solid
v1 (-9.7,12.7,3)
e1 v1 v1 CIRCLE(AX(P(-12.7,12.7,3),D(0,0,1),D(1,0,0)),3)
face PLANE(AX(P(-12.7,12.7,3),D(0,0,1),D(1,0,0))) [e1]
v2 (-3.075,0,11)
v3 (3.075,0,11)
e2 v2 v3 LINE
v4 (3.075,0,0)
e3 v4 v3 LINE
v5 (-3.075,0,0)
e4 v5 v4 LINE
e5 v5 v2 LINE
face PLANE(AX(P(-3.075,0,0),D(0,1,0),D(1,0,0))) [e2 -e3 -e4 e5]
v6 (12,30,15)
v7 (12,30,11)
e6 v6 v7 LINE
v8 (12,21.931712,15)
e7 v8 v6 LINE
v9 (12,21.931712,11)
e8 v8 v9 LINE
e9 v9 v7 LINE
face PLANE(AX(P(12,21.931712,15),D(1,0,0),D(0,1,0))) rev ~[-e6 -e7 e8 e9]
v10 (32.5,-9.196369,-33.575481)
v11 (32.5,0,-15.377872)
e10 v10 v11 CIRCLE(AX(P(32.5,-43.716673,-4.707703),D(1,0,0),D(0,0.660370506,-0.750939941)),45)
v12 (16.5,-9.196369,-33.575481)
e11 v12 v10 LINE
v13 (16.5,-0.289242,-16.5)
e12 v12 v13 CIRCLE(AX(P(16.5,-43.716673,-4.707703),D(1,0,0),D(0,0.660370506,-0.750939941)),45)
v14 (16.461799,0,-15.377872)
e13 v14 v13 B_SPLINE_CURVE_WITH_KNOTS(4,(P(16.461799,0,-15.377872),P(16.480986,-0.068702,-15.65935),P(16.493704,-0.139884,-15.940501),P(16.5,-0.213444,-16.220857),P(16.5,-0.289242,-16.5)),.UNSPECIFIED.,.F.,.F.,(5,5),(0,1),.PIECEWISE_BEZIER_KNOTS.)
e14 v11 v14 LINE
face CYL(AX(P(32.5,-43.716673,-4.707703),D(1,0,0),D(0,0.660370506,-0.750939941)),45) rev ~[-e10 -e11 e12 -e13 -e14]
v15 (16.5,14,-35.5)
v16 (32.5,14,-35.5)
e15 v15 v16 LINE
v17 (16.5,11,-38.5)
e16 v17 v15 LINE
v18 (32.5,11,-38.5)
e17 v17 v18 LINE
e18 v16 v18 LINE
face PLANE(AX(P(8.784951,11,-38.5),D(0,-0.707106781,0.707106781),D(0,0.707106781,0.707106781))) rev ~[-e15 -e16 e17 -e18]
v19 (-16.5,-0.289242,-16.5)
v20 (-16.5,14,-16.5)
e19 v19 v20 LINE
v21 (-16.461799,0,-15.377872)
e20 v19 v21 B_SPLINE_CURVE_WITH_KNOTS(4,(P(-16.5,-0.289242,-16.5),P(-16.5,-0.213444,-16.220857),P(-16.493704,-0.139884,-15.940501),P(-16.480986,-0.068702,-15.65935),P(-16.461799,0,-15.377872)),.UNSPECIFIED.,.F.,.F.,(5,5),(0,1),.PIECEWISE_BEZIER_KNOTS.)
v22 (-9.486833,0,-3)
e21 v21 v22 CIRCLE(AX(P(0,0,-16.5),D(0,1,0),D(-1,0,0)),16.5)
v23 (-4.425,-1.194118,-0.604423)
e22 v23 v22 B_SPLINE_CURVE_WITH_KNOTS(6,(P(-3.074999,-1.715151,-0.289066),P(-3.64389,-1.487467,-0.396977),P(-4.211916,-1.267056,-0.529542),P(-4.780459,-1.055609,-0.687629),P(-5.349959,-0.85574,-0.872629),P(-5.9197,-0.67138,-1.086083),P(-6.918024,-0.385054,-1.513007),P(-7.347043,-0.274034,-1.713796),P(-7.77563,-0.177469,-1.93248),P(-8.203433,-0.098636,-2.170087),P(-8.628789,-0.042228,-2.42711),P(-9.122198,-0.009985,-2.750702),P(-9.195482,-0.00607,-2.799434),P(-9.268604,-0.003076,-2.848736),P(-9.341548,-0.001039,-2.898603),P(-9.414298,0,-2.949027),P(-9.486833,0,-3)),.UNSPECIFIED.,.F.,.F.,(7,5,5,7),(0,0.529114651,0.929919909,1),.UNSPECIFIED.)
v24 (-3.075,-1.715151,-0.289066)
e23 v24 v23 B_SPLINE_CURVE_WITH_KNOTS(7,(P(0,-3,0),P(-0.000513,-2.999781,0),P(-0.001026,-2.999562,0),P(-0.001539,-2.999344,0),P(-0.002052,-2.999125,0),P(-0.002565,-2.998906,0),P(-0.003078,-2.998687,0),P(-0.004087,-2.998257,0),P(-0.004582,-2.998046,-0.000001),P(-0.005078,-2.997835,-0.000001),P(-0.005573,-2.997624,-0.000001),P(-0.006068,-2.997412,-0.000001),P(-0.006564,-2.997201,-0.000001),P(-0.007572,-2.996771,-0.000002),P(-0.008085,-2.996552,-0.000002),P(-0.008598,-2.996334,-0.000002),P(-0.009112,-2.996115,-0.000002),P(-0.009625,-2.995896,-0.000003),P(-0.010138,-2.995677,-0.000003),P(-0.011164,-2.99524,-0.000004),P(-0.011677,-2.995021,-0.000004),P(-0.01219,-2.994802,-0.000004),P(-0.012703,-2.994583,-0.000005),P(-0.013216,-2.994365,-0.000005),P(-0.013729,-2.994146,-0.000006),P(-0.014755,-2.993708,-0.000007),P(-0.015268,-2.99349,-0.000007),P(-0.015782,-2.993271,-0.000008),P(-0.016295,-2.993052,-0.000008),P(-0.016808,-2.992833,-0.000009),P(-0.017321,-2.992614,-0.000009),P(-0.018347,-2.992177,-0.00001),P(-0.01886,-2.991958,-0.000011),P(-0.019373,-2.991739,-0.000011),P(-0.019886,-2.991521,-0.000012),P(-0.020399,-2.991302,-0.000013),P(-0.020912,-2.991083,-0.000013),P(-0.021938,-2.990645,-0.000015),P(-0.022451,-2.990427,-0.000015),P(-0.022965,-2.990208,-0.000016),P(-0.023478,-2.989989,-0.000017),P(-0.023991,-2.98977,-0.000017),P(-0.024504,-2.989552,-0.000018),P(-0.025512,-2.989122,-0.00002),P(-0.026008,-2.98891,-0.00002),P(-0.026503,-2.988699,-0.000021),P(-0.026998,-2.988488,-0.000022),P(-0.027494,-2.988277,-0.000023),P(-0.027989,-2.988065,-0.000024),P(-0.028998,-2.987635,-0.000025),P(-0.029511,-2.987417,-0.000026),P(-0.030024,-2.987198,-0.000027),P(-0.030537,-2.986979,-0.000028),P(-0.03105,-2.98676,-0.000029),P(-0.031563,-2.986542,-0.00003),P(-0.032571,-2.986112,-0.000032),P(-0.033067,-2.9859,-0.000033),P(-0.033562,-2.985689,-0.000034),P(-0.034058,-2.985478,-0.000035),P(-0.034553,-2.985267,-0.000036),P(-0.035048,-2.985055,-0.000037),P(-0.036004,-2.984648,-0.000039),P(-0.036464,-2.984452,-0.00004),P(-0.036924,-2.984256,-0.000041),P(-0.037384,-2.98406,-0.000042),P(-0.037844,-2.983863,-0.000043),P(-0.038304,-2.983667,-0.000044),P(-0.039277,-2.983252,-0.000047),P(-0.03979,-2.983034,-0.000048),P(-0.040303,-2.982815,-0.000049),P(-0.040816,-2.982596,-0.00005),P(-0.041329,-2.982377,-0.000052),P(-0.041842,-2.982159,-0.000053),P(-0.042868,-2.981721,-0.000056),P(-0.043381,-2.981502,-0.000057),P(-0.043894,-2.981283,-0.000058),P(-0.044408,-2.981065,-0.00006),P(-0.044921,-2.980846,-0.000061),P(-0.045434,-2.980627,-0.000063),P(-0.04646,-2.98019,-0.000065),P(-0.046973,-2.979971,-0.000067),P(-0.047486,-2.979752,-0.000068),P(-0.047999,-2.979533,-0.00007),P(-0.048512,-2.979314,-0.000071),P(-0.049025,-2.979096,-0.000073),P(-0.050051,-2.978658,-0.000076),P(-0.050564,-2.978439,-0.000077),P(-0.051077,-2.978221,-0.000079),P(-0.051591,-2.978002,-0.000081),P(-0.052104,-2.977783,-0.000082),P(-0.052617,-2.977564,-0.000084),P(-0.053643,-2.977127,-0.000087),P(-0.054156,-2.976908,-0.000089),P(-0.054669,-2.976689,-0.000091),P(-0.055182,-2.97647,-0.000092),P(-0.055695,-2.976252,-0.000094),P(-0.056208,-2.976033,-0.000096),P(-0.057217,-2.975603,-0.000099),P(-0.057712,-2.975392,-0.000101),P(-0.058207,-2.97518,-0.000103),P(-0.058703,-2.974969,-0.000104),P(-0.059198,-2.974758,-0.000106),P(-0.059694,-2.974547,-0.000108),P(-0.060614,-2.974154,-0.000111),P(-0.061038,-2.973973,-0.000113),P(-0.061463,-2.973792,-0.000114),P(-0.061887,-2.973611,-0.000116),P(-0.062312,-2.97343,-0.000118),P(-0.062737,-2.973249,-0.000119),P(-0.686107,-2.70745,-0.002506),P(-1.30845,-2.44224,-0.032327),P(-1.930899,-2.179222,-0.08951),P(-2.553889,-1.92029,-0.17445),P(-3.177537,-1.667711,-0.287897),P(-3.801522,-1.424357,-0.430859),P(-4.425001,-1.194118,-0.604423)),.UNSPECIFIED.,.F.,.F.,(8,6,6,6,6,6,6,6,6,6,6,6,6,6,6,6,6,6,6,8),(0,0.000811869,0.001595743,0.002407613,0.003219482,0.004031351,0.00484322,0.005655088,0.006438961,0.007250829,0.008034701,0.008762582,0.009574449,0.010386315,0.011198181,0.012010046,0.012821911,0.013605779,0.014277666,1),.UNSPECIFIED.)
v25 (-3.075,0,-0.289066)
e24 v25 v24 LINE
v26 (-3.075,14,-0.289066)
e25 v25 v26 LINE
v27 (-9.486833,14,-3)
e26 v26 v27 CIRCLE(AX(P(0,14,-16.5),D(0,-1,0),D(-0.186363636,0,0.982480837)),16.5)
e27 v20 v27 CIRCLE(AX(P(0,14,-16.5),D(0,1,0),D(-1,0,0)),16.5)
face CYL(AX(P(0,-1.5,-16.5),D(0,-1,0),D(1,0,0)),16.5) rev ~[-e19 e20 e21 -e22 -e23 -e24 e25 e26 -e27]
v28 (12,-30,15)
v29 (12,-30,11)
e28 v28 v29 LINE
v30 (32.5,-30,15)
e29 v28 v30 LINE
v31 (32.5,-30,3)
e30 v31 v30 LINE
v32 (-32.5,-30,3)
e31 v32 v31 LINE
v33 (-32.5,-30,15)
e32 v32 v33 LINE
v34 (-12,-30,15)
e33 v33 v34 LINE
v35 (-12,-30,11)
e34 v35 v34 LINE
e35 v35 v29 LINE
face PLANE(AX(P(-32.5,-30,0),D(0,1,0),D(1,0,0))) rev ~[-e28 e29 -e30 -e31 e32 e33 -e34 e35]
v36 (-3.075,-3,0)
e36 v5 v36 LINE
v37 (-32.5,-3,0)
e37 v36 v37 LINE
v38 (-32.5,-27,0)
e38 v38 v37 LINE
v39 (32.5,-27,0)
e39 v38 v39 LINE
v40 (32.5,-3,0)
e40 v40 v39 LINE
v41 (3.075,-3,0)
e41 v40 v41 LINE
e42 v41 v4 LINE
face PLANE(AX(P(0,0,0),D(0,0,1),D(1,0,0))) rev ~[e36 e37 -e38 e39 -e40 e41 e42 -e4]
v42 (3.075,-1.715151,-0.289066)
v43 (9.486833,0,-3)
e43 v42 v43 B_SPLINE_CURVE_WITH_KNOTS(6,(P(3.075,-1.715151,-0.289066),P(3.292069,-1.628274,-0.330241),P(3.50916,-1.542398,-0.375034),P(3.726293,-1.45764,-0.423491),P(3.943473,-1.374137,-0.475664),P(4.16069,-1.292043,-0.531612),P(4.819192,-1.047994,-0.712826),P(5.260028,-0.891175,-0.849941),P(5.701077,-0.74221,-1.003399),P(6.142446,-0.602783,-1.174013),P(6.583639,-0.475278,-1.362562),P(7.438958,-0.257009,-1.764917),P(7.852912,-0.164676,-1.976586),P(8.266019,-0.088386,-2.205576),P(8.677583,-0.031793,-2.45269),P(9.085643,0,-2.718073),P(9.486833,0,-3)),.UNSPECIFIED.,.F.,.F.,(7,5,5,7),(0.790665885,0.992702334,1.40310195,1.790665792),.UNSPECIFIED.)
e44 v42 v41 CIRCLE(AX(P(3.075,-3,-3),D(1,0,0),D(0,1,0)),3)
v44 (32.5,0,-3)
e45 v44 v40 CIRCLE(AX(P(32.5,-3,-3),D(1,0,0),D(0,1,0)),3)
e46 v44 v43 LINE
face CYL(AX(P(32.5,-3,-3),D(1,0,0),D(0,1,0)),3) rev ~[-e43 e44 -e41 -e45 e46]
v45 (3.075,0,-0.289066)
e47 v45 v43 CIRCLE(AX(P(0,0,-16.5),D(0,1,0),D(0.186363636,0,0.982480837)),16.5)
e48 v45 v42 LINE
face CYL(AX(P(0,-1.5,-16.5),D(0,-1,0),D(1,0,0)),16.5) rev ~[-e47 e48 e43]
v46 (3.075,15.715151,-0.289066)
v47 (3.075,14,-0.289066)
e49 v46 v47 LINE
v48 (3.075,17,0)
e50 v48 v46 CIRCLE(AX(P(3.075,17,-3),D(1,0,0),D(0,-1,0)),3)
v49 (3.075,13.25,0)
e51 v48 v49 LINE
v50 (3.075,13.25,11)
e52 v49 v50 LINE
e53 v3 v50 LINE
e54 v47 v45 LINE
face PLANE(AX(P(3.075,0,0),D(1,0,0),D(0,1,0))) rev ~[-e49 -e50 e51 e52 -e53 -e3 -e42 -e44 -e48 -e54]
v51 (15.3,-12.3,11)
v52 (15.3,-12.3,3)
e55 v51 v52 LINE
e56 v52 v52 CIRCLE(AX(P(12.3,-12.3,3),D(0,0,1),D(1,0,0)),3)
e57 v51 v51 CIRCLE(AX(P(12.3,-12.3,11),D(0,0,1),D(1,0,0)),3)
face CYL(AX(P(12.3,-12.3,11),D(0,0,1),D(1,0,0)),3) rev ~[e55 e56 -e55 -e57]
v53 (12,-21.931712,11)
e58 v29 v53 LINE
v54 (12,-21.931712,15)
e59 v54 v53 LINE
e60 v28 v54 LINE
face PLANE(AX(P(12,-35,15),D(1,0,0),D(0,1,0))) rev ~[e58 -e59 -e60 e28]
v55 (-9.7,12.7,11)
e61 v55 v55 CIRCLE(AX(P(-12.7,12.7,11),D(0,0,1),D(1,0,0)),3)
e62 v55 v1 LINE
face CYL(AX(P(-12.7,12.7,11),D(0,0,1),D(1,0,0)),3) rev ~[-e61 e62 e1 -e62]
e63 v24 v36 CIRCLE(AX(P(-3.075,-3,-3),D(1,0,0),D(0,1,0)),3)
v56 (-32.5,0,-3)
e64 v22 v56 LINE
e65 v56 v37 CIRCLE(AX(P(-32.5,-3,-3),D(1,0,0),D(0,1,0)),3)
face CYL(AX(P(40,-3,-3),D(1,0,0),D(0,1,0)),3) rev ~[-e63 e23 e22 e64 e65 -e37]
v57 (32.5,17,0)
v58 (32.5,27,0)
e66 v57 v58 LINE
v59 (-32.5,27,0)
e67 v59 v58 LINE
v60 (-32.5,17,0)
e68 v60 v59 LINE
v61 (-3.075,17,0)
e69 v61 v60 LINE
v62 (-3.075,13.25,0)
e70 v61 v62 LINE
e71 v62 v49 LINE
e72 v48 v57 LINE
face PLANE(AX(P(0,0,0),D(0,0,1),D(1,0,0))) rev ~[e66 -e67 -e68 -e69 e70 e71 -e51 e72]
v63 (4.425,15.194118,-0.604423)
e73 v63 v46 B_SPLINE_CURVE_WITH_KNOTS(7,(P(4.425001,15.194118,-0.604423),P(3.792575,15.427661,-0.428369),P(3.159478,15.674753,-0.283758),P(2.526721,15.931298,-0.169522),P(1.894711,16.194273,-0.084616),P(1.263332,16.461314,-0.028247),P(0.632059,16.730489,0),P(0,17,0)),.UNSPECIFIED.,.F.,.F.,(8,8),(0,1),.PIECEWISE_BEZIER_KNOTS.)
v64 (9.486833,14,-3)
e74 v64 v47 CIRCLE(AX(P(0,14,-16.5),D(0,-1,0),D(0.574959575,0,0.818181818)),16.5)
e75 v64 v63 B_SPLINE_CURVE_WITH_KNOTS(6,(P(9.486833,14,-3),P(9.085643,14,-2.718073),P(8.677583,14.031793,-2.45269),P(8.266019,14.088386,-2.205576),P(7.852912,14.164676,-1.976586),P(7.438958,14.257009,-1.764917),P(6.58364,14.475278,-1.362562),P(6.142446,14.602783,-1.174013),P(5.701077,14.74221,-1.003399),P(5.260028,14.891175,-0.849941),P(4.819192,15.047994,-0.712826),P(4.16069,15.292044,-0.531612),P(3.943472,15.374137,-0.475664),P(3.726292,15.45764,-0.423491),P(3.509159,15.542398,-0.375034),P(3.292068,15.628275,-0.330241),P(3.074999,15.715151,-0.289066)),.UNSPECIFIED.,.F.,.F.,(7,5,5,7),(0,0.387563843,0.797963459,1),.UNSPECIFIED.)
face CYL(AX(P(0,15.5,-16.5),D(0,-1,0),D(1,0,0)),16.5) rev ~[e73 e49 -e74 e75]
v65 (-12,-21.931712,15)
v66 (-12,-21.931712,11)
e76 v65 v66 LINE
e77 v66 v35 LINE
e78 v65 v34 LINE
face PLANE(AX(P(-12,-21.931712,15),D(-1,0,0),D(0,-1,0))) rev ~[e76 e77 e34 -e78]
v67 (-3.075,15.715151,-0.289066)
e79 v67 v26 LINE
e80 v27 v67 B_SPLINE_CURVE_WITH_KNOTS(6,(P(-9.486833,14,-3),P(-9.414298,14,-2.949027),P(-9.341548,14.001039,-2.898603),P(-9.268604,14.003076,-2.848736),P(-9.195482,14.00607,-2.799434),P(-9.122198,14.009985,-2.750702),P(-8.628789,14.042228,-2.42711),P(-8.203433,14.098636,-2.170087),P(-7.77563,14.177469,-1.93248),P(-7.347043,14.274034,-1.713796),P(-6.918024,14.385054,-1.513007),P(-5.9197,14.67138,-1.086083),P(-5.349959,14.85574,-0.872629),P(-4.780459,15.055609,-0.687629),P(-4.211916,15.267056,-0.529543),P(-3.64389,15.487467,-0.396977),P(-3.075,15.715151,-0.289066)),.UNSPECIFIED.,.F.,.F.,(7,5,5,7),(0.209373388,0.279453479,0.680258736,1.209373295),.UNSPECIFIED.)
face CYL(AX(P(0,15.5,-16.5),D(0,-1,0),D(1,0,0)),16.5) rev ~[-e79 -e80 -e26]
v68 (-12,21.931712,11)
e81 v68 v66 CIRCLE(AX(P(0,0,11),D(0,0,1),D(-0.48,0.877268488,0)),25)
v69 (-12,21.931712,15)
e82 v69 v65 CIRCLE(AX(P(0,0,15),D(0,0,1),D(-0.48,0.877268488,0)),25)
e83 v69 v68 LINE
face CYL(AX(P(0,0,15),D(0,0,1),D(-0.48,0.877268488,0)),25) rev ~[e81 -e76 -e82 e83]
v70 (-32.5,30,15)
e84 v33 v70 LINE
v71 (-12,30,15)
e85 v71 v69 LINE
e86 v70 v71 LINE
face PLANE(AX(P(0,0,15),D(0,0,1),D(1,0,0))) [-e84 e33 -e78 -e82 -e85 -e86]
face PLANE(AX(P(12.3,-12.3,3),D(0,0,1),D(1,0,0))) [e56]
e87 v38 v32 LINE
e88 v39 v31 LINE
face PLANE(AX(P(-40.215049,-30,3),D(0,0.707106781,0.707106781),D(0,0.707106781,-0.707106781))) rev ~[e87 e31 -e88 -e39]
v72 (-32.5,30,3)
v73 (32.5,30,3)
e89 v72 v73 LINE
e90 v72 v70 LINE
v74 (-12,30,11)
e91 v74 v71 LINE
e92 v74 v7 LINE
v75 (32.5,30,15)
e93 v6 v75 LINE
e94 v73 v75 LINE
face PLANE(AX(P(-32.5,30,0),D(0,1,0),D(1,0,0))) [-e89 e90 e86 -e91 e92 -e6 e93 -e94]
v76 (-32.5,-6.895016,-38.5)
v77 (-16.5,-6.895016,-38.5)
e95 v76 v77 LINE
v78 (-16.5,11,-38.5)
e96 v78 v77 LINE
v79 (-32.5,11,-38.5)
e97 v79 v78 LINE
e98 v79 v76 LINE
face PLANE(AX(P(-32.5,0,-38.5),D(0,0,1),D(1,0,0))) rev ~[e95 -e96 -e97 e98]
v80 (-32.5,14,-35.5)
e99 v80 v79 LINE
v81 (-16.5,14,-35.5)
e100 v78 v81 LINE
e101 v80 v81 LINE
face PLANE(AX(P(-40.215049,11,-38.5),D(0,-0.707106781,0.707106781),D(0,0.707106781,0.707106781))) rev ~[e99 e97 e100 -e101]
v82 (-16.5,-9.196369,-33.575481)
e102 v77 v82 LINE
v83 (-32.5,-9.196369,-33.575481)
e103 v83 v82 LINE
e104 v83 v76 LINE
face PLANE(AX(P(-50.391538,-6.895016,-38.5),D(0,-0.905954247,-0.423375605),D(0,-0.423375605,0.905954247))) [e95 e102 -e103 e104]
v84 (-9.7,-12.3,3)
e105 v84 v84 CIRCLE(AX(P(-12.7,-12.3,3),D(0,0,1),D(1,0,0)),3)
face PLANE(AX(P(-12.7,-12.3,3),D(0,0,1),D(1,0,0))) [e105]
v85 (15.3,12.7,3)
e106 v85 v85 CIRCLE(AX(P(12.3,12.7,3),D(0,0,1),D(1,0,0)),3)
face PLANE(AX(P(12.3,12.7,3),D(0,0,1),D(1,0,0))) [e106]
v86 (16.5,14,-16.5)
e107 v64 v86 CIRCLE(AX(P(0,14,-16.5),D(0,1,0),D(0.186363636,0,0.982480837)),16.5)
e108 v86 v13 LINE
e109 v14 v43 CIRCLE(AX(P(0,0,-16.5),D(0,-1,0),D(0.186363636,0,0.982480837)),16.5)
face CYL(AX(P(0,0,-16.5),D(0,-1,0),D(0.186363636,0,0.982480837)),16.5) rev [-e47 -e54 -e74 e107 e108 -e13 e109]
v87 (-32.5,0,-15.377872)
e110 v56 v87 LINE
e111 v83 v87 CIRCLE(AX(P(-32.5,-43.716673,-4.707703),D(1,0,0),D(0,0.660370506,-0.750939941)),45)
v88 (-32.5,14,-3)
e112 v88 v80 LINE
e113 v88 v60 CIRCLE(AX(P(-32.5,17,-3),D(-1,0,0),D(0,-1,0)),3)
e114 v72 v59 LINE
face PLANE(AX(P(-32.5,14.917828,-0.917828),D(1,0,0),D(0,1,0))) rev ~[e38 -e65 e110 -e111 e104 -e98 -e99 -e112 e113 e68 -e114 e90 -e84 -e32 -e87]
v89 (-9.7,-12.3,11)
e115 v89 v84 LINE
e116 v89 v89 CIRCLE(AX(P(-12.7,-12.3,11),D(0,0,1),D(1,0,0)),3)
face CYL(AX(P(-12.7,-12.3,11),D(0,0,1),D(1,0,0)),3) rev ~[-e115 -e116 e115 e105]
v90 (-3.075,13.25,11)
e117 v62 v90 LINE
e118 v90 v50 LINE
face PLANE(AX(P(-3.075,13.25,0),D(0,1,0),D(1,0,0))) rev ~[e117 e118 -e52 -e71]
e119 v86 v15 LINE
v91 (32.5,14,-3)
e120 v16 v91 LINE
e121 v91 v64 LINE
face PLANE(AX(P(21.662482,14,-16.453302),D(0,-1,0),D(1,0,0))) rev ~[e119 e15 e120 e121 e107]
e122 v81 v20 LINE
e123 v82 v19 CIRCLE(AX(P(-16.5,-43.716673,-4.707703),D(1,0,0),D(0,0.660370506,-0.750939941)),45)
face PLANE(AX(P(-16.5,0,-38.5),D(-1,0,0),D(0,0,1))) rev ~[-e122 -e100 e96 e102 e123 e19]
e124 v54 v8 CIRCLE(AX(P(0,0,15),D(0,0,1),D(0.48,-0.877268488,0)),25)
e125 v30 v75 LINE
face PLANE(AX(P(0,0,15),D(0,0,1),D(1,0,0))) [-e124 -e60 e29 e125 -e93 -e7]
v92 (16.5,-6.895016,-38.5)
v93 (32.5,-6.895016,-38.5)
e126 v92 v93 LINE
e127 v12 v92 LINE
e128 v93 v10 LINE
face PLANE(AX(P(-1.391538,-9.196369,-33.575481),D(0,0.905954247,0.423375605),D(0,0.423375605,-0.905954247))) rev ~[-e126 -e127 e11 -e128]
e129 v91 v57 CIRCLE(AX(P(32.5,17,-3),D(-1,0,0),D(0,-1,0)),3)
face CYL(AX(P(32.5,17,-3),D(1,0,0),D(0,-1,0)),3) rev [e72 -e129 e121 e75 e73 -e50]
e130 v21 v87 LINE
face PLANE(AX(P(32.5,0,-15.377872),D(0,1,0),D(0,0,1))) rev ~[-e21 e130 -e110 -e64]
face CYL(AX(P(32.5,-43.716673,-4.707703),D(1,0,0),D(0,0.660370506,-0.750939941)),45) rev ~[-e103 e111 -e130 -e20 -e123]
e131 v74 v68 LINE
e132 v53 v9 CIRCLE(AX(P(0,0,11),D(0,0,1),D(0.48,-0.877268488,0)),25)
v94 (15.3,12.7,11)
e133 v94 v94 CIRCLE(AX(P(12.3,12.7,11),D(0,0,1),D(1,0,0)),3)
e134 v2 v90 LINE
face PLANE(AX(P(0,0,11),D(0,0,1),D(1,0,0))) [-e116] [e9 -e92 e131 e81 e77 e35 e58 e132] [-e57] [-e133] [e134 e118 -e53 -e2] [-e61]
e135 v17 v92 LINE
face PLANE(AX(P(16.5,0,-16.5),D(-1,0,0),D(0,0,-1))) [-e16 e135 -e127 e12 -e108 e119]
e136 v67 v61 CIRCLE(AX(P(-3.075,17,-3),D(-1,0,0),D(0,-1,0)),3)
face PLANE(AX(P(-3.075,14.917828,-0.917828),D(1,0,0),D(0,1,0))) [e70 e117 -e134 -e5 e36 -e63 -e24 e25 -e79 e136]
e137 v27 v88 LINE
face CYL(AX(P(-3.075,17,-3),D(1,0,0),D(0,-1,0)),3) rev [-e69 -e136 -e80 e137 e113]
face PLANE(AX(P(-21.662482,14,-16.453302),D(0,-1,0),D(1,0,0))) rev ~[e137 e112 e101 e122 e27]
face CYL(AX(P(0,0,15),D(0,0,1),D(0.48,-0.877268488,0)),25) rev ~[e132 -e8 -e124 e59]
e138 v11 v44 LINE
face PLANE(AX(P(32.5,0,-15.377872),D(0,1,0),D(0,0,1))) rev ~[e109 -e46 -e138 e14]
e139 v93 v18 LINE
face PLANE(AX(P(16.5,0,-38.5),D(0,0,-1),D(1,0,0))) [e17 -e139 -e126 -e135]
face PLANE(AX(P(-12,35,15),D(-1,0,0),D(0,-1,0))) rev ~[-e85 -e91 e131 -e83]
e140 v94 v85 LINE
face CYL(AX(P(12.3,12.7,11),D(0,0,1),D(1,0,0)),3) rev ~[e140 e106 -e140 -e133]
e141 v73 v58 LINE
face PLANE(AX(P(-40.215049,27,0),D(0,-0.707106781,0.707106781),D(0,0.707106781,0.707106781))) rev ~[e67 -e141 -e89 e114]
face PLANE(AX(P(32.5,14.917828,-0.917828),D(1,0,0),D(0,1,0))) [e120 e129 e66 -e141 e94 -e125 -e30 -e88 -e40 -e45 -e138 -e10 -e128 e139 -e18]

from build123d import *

# Parameters (mm, degrees)
F0_W          = 65
F0_H          = 60
F0_W_2        = 6.15
F0_H_2        = 13.25
F1_DEPTH      = 15
F3_DEPTH      = 14
F5_DEPTH      = 4
F6_R          = 3
F7_DEPTH      = 8
F9_DEPTH      = 90
F10_T4_DEPTH  = 29.425
F10_S5_R      = 16.5
F10_T6_DEPTH  = 16
F10_T10_DEPTH = 44.425
F10_S11_R     = 16.5
F10_T12_DEPTH = 24
F10_T17_DEPTH = 44.425
F10_S18_R     = 16.5
F10_T19_DEPTH = 24
F10_T24_DEPTH = 29.425
F10_S25_R     = 16.5
F10_T26_DEPTH = 16
F10_T30_DEPTH = 44.425
F10_S31_R     = 16.5
F10_T32_DEPTH = 24
F10_T37_DEPTH = 29.425
F10_S38_R     = 16.5
F10_T39_DEPTH = 16
F10_T43_DEPTH = 29.425
F10_S44_R     = 16.5
F10_T45_DEPTH = 16
F10_T49_DEPTH = 44.425
F10_S50_R     = 16.5
F10_T51_DEPTH = 24
F11_T1_DEPTH  = 80.4300979278
F11_T3_DEPTH  = 51.7830754439
F11_T5_DEPTH  = 51.7830754439
F11_T7_DEPTH  = 31.4300979278
F11_T9_DEPTH  = 31.4300979278


# Not quite as in the source:
# - a fillet or chamfer that OpenCascade refuses, or shapes differently, is made with other operations: its cross-section is extruded or revolved along the edge and cut away or added


with BuildPart() as f1:
    # F0 (on Top) → F1 (new body)
    with BuildSketch(Plane.XY):
        Rectangle(F0_W, F0_H)
        with Locations((0, 6.625)):
            Rectangle(F0_W_2, F0_H_2, mode=Mode.SUBTRACT)
    extrude(amount=F1_DEPTH)

    # F2 (on Front) → F3 (join, symmetric)
    with BuildSketch(Plane.XZ):
        with BuildLine():
            Line((-3.075, 0), (-32.5, 0))
            Line((-32.5, 0), (-32.5, -38.5))
            Line((-32.5, -38.5), (-16.5, -38.5))
            Line((-16.5, -38.5), (-16.5, -16.5))
            ThreePointArc((-16.5, -16.5), (-12.7080191218, -5.9759204678), (-3.075, -0.2890661898))
            Line((-3.075, -0.2890661898), (-3.075, 0))
        make_face()
        with BuildLine():
            Line((3.075, 0), (3.075, -0.2890661898))
            ThreePointArc((3.075, -0.2890661898), (12.7080191218, -5.9759204678), (16.5, -16.5))
            Line((16.5, -16.5), (16.5, -38.5))
            Line((16.5, -38.5), (32.5, -38.5))
            Line((32.5, -38.5), (32.5, 0))
            Line((32.5, 0), (3.075, 0))
        make_face()
    extrude(amount=F3_DEPTH, both=True)

    # F4 (on face) → F5 (cut)
    with BuildSketch(Plane.XY.offset(15)):
        with BuildLine():
            ThreePointArc((12, -21.9317121995), (25, 0), (12, 21.9317121995))
            Line((12, 21.9317121995), (12, 35))
            Line((12, 35), (-12, 35))
            Line((-12, 35), (-12, 21.9317121995))
            ThreePointArc((-12, 21.9317121995), (-25, 0), (-12, -21.9317121995))
            Line((-12, -21.9317121995), (-12, -35))
            Line((-12, -35), (12, -35))
            Line((12, -35), (12, -21.9317121995))
        make_face()
    extrude(amount=-F5_DEPTH, mode=Mode.SUBTRACT)

    # F6 (on face) → F7 (cut)
    with BuildSketch(Plane.XY.offset(11)):
        with Locations((-12.7, 12.7)):
            Circle(F6_R)
        with Locations((12.3, 12.7)):
            Circle(F6_R)
        with Locations((12.3, -12.3)):
            Circle(F6_R)
        with Locations((-12.7, -12.3)):
            Circle(F6_R)
    extrude(amount=-F7_DEPTH, mode=Mode.SUBTRACT)

    # F8 (on face) → F9 (cut)
    with BuildSketch(Plane.YZ.offset(32.5)):
        with BuildLine():
            Line((0, -15.3778724497), (0, 0))
            Line((0, 0), (-14, 0))
            Line((-14, 0), (-14, -38.5))
            ThreePointArc((-14, -38.5), (-5.2228777507, -28.0149492966), (0, -15.3778724497))
        make_face()
    extrude(amount=-F9_DEPTH, mode=Mode.SUBTRACT)

    # F10: fillet of radius 3 on 4 edges, made by hand


with BuildPart() as f10_tool2:
    # F10_s3 → F10_t4 (new body)
    with BuildSketch(Plane.YZ.offset(32.5)):
        with BuildLine():
            ThreePointArc((0, -3), (-0.8786796564, -0.8786796564), (-3, 0))
            Line((-3, 0), (0, 0))
            Line((0, 0), (0, -3))
        make_face()
    extrude(amount=-F10_T4_DEPTH)

    # F10_s5 → F10_t6 (cut, symmetric)
    with BuildSketch(Plane.XZ.offset(1.5)):
        with Locations((0, -16.5)):
            Circle(F10_S5_R)
    extrude(amount=F10_T6_DEPTH, both=True, mode=Mode.SUBTRACT)


with BuildPart() as f1_1:
    add(f1.part)

    # F10_t1: union F10_tool2
    add(f10_tool2.part)


with BuildPart() as f10_tool8:
    # F10_s9 → F10_t10 (new body)
    with BuildSketch(Plane.YZ.offset(40)):
        with BuildLine():
            ThreePointArc((0, -3), (-0.8786796564, -0.8786796564), (-3, 0))
            Line((-3, 0), (0, 0))
            Line((0, 0), (0, -3))
        make_face()
    extrude(amount=-F10_T10_DEPTH)

    # F10_s11 → F10_t12 (cut, symmetric)
    with BuildSketch(Plane.XZ.offset(1.5)):
        with Locations((0, -16.5)):
            Circle(F10_S11_R)
    extrude(amount=F10_T12_DEPTH, both=True, mode=Mode.SUBTRACT)

    split(bisect_by=Plane.YZ.offset(-3.075), keep=Keep.BOTTOM)


with BuildPart() as f1_2:
    add(f1_1.part)

    # F10_t7: union F10_tool8
    add(f10_tool8.part)


with BuildPart() as f10_tool15:
    # F10_s16 → F10_t17 (new body)
    with BuildSketch(Plane.YZ.offset(4.425)):
        with BuildLine():
            ThreePointArc((0, -3), (-0.8786796564, -0.8786796564), (-3, 0))
            Line((-3, 0), (0, 0))
            Line((0, 0), (0, -3))
        make_face()
    extrude(amount=-F10_T17_DEPTH)

    # F10_s18 → F10_t19 (cut, symmetric)
    with BuildSketch(Plane.XZ.offset(1.5)):
        with Locations((0, -16.5)):
            Circle(F10_S18_R)
    extrude(amount=F10_T19_DEPTH, both=True, mode=Mode.SUBTRACT)

    split(bisect_by=Plane.YZ.offset(3.075), keep=Keep.TOP)


with BuildPart() as f1_3:
    add(f1_2.part)

    # F10_t14: union F10_tool15
    add(f10_tool15.part)


with BuildPart() as f10_tool22:
    # F10_s23 → F10_t24 (new body)
    with BuildSketch(Plane.YZ.offset(-3.075)):
        with BuildLine():
            ThreePointArc((0, -3), (-0.8786796564, -0.8786796564), (-3, 0))
            Line((-3, 0), (0, 0))
            Line((0, 0), (0, -3))
        make_face()
    extrude(amount=-F10_T24_DEPTH)

    # F10_s25 → F10_t26 (cut, symmetric)
    with BuildSketch(Plane.XZ.offset(1.5)):
        with Locations((0, -16.5)):
            Circle(F10_S25_R)
    extrude(amount=F10_T26_DEPTH, both=True, mode=Mode.SUBTRACT)


with BuildPart() as f1_4:
    add(f1_3.part)

    # F10_t21: union F10_tool22
    add(f10_tool22.part)


with BuildPart() as f10_tool28:
    # F10_s29 → F10_t30 (new body)
    with BuildSketch(Plane.YZ.offset(4.425)):
        with BuildLine():
            ThreePointArc((14, -3), (14.8786796564, -0.8786796564), (17, 0))
            Line((17, 0), (14, 0))
            Line((14, 0), (14, -3))
        make_face()
    extrude(amount=-F10_T30_DEPTH)

    # F10_s31 → F10_t32 (cut, symmetric)
    with BuildSketch(Plane.XZ.offset(-15.5)):
        with Locations((0, -16.5)):
            Circle(F10_S31_R)
    extrude(amount=F10_T32_DEPTH, both=True, mode=Mode.SUBTRACT)

    split(bisect_by=Plane.YZ.offset(3.075), keep=Keep.TOP)


with BuildPart() as f1_5:
    add(f1_4.part)

    # F10_t27: union F10_tool28
    add(f10_tool28.part)


with BuildPart() as f10_tool35:
    # F10_s36 → F10_t37 (new body)
    with BuildSketch(Plane.YZ.offset(-3.075)):
        with BuildLine():
            ThreePointArc((14, -3), (14.8786796564, -0.8786796564), (17, 0))
            Line((17, 0), (14, 0))
            Line((14, 0), (14, -3))
        make_face()
    extrude(amount=-F10_T37_DEPTH)

    # F10_s38 → F10_t39 (cut, symmetric)
    with BuildSketch(Plane.XZ.offset(-15.5)):
        with Locations((0, -16.5)):
            Circle(F10_S38_R)
    extrude(amount=F10_T39_DEPTH, both=True, mode=Mode.SUBTRACT)


with BuildPart() as f1_6:
    add(f1_5.part)

    # F10_t34: union F10_tool35
    add(f10_tool35.part)


with BuildPart() as f10_tool41:
    # F10_s42 → F10_t43 (new body)
    with BuildSketch(Plane.YZ.offset(32.5)):
        with BuildLine():
            ThreePointArc((14, -3), (14.8786796564, -0.8786796564), (17, 0))
            Line((17, 0), (14, 0))
            Line((14, 0), (14, -3))
        make_face()
    extrude(amount=-F10_T43_DEPTH)

    # F10_s44 → F10_t45 (cut, symmetric)
    with BuildSketch(Plane.XZ.offset(-15.5)):
        with Locations((0, -16.5)):
            Circle(F10_S44_R)
    extrude(amount=F10_T45_DEPTH, both=True, mode=Mode.SUBTRACT)


with BuildPart() as f1_7:
    add(f1_6.part)

    # F10_t40: union F10_tool41
    add(f10_tool41.part)


with BuildPart() as f10_tool47:
    # F10_s48 → F10_t49 (new body)
    with BuildSketch(Plane.YZ.offset(40)):
        with BuildLine():
            ThreePointArc((14, -3), (14.8786796564, -0.8786796564), (17, 0))
            Line((17, 0), (14, 0))
            Line((14, 0), (14, -3))
        make_face()
    extrude(amount=-F10_T49_DEPTH)

    # F10_s50 → F10_t51 (cut, symmetric)
    with BuildSketch(Plane.XZ.offset(-15.5)):
        with Locations((0, -16.5)):
            Circle(F10_S50_R)
    extrude(amount=F10_T51_DEPTH, both=True, mode=Mode.SUBTRACT)

    split(bisect_by=Plane.YZ.offset(-3.075), keep=Keep.BOTTOM)


with BuildPart() as f1_8:
    add(f1_7.part)

    # F10_t46: union F10_tool47
    add(f10_tool47.part)

    # F11: chamfer of 3 on 6 edges, made by hand

    # F11_s2 → F11_t1 (cut)
    with BuildSketch(Plane.YZ.offset(-40.2150489639)):
        Polygon((-30, 3), (-27, 0), (-30, 0), align=None)
        Polygon((27, 0), (30, 3), (30, 0), align=None)
    extrude(amount=F11_T1_DEPTH, mode=Mode.SUBTRACT)

    # F11_s4 → F11_t3 (cut)
    with BuildSketch(Plane.YZ.offset(-50.391537722)):
        with BuildLine():
            Line((-6.8950157601, -38.5), (-9.1963693219, -33.5754814152))
            ThreePointArc((-9.1963693219, -33.5754814152), (-11.4890994339, -36.1144458386), (-14, -38.5))
            Line((-14, -38.5), (-6.8950157601, -38.5))
        make_face()
    extrude(amount=F11_T3_DEPTH, mode=Mode.SUBTRACT)

    # F11_s6 → F11_t5 (cut)
    with BuildSketch(Plane.YZ.offset(-1.391537722)):
        with BuildLine():
            Line((-9.1963693219, -33.5754814152), (-6.8950157601, -38.5))
            Line((-6.8950157601, -38.5), (-14, -38.5))
            ThreePointArc((-14, -38.5), (-11.4890994339, -36.1144458386), (-9.1963693219, -33.5754814152))
        make_face()
    extrude(amount=F11_T5_DEPTH, mode=Mode.SUBTRACT)

    # F11_s8 → F11_t7 (cut)
    with BuildSketch(Plane.YZ.offset(8.7849510361)):
        Polygon((11, -38.5), (14, -35.5), (14, -38.5), align=None)
    extrude(amount=F11_T7_DEPTH, mode=Mode.SUBTRACT)

    # F11_s10 → F11_t9 (cut)
    with BuildSketch(Plane.YZ.offset(-40.2150489639)):
        Polygon((11, -38.5), (14, -35.5), (14, -38.5), align=None)
    extrude(amount=F11_T9_DEPTH, mode=Mode.SUBTRACT)


solid = f1_8.part
